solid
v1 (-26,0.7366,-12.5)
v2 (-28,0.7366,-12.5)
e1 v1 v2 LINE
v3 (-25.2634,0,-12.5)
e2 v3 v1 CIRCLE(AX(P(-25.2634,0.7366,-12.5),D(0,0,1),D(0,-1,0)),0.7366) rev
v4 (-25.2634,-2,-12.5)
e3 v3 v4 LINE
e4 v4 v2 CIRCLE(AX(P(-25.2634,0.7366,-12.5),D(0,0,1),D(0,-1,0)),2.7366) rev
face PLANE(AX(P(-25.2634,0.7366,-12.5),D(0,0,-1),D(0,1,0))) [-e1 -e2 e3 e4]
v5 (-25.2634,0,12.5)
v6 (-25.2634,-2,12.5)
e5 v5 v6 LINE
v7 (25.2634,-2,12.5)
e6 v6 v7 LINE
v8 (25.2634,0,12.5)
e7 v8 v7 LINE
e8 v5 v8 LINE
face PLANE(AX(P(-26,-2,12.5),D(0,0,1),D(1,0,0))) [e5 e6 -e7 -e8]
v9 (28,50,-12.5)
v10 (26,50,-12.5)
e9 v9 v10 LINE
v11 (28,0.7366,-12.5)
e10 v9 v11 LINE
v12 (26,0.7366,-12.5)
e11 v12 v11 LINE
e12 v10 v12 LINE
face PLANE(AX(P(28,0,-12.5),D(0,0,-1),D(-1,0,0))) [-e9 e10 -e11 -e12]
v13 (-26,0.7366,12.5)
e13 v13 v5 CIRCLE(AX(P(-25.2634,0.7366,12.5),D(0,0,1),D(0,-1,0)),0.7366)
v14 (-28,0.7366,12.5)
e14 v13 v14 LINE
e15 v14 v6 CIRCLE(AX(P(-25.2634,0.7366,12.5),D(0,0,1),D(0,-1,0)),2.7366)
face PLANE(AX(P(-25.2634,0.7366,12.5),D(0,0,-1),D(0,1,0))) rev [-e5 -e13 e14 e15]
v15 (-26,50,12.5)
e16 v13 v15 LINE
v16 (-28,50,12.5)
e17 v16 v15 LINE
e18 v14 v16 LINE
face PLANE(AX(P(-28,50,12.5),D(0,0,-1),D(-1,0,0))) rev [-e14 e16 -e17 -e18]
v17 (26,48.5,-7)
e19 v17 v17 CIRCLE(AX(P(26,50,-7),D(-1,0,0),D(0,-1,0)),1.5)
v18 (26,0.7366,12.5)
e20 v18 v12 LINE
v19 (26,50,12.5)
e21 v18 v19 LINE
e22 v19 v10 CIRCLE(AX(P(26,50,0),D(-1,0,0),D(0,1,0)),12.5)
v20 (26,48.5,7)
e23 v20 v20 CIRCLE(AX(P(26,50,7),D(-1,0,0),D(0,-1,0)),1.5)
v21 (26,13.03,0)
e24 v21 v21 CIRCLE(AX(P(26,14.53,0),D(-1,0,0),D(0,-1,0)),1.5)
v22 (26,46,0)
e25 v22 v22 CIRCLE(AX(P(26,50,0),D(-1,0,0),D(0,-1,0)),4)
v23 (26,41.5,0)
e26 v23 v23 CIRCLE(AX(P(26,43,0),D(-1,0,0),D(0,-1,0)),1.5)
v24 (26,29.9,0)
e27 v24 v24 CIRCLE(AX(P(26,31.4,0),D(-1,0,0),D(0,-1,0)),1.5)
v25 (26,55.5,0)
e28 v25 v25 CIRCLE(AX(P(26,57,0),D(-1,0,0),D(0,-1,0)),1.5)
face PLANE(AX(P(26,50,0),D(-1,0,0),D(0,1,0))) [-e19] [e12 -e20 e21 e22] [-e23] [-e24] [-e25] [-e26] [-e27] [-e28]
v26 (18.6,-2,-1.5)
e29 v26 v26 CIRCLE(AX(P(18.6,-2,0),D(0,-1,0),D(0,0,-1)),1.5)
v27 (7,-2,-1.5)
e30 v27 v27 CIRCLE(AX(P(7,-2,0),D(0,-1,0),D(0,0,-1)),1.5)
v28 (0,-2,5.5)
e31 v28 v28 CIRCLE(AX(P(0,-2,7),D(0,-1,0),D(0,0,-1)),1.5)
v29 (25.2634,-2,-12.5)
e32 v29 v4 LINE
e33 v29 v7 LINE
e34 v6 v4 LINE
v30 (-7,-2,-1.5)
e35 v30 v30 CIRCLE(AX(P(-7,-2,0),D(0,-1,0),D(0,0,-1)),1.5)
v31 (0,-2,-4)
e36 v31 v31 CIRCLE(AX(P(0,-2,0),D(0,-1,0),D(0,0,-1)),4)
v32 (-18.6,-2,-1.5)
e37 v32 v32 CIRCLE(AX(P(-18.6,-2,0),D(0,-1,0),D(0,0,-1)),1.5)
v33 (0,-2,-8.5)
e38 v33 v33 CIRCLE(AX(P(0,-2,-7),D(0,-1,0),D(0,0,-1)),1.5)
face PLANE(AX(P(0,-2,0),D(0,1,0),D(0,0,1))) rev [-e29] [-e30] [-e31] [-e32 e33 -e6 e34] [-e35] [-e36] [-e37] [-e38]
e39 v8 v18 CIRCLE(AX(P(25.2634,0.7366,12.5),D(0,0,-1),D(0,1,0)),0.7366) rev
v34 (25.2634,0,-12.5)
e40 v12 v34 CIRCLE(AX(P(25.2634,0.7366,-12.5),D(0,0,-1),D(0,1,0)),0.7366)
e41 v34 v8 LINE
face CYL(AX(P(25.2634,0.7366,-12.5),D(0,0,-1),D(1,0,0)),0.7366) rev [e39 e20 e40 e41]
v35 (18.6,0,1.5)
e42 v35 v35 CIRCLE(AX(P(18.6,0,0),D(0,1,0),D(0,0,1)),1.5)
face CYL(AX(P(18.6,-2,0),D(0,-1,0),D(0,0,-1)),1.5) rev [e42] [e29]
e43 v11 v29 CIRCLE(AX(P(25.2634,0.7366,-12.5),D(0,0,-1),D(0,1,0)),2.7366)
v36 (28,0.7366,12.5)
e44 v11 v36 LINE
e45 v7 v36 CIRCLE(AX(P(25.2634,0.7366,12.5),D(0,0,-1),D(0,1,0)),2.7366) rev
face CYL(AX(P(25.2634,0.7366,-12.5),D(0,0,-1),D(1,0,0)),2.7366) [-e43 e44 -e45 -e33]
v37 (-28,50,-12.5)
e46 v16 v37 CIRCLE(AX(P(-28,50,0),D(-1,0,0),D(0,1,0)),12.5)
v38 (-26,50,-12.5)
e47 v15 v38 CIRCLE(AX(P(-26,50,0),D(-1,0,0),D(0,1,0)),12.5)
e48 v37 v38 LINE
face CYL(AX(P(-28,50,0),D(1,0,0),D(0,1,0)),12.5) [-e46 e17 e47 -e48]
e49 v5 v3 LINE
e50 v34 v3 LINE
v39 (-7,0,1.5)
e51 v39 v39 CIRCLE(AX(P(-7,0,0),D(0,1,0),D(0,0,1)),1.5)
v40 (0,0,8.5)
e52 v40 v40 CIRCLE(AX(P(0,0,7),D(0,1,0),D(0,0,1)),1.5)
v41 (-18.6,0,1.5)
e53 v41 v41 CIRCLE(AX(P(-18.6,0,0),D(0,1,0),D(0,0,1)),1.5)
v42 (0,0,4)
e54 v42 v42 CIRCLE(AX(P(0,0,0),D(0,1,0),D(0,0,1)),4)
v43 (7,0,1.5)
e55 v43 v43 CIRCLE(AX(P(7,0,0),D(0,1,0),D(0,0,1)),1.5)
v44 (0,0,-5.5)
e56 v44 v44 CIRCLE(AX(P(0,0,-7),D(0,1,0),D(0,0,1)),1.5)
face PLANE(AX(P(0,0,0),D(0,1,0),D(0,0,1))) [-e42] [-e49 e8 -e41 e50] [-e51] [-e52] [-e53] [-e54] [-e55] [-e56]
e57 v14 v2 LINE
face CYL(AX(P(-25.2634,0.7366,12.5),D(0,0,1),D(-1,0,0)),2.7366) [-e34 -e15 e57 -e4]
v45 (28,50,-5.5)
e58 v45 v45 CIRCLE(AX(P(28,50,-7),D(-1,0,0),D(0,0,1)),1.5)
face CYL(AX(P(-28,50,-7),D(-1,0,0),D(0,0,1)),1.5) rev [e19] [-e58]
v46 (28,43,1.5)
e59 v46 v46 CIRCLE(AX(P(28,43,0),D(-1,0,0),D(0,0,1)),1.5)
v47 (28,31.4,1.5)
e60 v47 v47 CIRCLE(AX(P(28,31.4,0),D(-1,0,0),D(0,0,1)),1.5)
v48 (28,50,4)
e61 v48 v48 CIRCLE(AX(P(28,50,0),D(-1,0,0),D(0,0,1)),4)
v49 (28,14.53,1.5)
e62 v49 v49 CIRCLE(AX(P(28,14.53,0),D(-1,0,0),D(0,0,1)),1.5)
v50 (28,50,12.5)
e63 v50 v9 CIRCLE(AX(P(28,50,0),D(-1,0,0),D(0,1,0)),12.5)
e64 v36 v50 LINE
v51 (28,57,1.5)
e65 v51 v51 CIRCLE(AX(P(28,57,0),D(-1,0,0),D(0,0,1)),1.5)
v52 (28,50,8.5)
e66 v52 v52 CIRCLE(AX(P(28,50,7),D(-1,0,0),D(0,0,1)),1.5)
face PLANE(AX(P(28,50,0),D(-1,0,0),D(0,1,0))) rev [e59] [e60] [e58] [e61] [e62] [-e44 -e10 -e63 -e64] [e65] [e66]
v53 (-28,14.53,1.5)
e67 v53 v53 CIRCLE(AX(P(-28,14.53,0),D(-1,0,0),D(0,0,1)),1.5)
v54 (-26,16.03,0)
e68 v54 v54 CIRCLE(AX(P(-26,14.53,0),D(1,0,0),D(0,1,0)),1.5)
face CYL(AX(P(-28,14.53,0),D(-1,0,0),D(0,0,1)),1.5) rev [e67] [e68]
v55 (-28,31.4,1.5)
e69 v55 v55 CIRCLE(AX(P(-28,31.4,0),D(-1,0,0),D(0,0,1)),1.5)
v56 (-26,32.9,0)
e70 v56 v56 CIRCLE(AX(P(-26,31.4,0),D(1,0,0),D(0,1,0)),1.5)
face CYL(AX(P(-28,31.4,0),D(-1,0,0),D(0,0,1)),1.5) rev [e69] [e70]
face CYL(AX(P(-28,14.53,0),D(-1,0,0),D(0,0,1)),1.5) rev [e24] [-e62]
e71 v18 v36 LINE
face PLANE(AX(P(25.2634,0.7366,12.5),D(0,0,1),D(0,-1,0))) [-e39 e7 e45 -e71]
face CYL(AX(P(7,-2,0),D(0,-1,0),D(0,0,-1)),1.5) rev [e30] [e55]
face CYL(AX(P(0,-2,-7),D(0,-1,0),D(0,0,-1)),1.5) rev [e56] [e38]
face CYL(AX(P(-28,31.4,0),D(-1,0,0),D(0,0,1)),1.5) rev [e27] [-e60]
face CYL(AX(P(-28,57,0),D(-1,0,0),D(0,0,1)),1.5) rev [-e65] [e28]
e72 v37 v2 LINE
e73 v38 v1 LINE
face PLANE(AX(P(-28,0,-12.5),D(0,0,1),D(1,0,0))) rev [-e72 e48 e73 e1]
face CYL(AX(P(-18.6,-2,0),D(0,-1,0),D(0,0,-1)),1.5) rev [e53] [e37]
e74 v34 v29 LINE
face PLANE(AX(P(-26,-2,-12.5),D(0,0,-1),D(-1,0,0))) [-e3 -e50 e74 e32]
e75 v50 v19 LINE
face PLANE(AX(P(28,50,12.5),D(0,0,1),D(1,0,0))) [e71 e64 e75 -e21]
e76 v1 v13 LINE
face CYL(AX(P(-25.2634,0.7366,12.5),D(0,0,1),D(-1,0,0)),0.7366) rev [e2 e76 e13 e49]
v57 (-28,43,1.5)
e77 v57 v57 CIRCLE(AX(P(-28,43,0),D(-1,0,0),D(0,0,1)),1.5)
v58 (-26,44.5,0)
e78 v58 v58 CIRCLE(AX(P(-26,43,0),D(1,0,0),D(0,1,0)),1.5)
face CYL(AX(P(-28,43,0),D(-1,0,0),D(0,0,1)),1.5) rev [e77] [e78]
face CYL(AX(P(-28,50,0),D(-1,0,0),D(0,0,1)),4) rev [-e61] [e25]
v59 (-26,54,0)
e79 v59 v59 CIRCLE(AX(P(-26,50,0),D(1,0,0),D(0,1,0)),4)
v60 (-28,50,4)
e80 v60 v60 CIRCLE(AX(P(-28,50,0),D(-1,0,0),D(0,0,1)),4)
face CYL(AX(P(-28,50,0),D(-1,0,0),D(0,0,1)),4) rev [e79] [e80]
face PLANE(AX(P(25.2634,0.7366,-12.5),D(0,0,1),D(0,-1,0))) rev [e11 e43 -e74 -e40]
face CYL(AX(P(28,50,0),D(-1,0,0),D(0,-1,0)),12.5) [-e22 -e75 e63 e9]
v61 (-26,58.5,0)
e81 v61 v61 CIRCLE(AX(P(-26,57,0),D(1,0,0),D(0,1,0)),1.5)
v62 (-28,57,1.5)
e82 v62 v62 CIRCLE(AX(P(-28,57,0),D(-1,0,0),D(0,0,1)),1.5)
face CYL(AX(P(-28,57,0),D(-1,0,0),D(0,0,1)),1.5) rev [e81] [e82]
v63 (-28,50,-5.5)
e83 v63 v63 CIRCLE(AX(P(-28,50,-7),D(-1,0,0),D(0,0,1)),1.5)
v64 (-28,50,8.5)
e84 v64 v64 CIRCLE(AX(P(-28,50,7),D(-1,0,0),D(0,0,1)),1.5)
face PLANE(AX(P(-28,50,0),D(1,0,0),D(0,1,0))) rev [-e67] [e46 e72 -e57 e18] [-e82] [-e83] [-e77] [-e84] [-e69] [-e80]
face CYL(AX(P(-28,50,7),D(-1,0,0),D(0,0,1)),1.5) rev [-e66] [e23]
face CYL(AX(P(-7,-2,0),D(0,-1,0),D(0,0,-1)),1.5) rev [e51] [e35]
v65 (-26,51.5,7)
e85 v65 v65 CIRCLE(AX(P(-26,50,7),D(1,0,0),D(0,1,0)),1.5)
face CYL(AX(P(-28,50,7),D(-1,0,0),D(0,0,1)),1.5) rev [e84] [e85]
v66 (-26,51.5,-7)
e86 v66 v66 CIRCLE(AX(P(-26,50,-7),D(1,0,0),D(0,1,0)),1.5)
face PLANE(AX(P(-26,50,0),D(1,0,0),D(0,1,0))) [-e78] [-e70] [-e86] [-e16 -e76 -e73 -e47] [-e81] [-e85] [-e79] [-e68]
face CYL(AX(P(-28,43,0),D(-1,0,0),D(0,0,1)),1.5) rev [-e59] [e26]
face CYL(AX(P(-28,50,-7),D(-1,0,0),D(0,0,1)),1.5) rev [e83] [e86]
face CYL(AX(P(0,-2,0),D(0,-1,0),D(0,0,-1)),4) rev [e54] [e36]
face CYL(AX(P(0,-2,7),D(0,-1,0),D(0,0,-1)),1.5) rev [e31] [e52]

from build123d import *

# Parameters (mm, degrees)
SKETCH_1_W                       = 52
SKETCH_1_H                       = 25
SM_BASE_FLANGE_1_DEPTH           = 2
SM_EDGE_FLANGE_1_STRIP_W         = 9.4732
SM_EDGE_FLANGE_1_STRIP_H         = 2
SM_EDGE_FLANGE_1_STRIP_CUT_DEPTH = 25
SM_EDGE_FLANGE_1_DEPTH           = 25
SM_START                         = 2
SM_EDGE_FLANGE_1_FLAT_DEPTH      = 2
HOLE_WIZARD_3_0_3_1_D            = 3
HOLE_WIZARD_8_0_8_2_D            = 8
HOLE_WIZARD_8_0_8_3_D            = 8
HOLE_WIZARD_3_0_3_2_D            = 3


# Sheet-metal steps are written as plain solids
with BuildPart() as part:
    # Sketch 1 → 基体-法兰1 (new body)
    with BuildSketch(Plane(origin=(0, 0, 0), x_dir=(1, 0, 0), z_dir=(0, 1, 0))):
        Rectangle(SKETCH_1_W, SKETCH_1_H)
    extrude(amount=-SM_BASE_FLANGE_1_DEPTH)

    # 边线-法兰1 strip (across the edge) → 边线-法兰1 strip cut (cut)
    with BuildSketch(Plane(origin=(-26, 0, -12.5), x_dir=(1, 0, 0), z_dir=(0, 0, 1))):
        with Locations((-4, -1)):
            Rectangle(SM_EDGE_FLANGE_1_STRIP_W, SM_EDGE_FLANGE_1_STRIP_H)
    sm_edge_flange_1_strip_cut = extrude(amount=SM_EDGE_FLANGE_1_STRIP_CUT_DEPTH, mode=Mode.SUBTRACT)

    # 边线-法兰1 bend section (across the edge) → 边线-法兰1 (add)
    with BuildSketch(Plane(origin=(-26, 0, -12.5), x_dir=(1, 0, 0), z_dir=(0, 0, 1))):
        with BuildLine():
            Line((-2, 0.7366), (0, 0.7366))
            ThreePointArc((0, 0.7366), (0.215745145, 0.215745145), (0.7366, 0))
            Line((0.7366, 0), (0.7366, -2))
            ThreePointArc((0.7366, -2), (-1.198468417, -1.198468417), (-2, 0.7366))
        make_face()
    sm_edge_flange_1 = extrude(amount=SM_EDGE_FLANGE_1_DEPTH)

    # 边线-法兰1 profile (on flange) → 边线-法兰1 flat (add)
    with BuildSketch(Plane.ZY.offset(26).offset(SM_START)):
        with BuildLine():
            ThreePointArc((12.5, 50), (0, 62.5), (-12.5, 50))
            Line((-12.5, 50), (-12.5, 0.7366))
            Line((-12.5, 0.7366), (12.5, 0.7366))
            Line((12.5, 0.7366), (12.5, 50))
        make_face()
    sm_edge_flange_1_flat = extrude(amount=-SM_EDGE_FLANGE_1_FLAT_DEPTH)

    # 镜向1: 边线-法兰1 strip cut, 边线-法兰1, 边线-法兰1 flat across plane
    add(sm_edge_flange_1_strip_cut.mirror(Plane(origin=(0, 0, 0), x_dir=(0, 0, 1), z_dir=(1, 0, 0))), mode=Mode.SUBTRACT)
    add(sm_edge_flange_1.mirror(Plane(origin=(0, 0, 0), x_dir=(0, 0, 1), z_dir=(1, 0, 0))))
    add(sm_edge_flange_1_flat.mirror(Plane(origin=(0, 0, 0), x_dir=(0, 0, 1), z_dir=(1, 0, 0))))

    # Ø3.0 (3) 直径孔1 (through all)
    with Locations(Plane(origin=(0, -2, 0), x_dir=(-1, 0, 0), z_dir=(0, -1, 0))):
        with Locations((0, 7), (0, -7), (7, 0), (18.6, 0), (-7, 0), (-18.6, 0)):
            Hole(HOLE_WIZARD_3_0_3_1_D / 2)

    # Ø8.0 (8) 直径孔2 (through all)
    with Locations(Plane(origin=(0, -2, 0), x_dir=(-1, 0, 0), z_dir=(0, -1, 0))):
        with Locations((0, 0)):
            Hole(HOLE_WIZARD_8_0_8_2_D / 2)

    # Ø8.0 (8) 直径孔3 (through all)
    with Locations(Plane.ZY.offset(28)):
        with Locations((0, 50)):
            Hole(HOLE_WIZARD_8_0_8_3_D / 2)

    # Ø3.0 (3) 直径孔2 (through all)
    with Locations(Plane.ZY.offset(28)):
        with Locations((-7, 50), (7, 50), (0, 57), (0, 43), (0, 31.4), (0, 14.53)):
            Hole(HOLE_WIZARD_3_0_3_2_D / 2)


solid = part.part
